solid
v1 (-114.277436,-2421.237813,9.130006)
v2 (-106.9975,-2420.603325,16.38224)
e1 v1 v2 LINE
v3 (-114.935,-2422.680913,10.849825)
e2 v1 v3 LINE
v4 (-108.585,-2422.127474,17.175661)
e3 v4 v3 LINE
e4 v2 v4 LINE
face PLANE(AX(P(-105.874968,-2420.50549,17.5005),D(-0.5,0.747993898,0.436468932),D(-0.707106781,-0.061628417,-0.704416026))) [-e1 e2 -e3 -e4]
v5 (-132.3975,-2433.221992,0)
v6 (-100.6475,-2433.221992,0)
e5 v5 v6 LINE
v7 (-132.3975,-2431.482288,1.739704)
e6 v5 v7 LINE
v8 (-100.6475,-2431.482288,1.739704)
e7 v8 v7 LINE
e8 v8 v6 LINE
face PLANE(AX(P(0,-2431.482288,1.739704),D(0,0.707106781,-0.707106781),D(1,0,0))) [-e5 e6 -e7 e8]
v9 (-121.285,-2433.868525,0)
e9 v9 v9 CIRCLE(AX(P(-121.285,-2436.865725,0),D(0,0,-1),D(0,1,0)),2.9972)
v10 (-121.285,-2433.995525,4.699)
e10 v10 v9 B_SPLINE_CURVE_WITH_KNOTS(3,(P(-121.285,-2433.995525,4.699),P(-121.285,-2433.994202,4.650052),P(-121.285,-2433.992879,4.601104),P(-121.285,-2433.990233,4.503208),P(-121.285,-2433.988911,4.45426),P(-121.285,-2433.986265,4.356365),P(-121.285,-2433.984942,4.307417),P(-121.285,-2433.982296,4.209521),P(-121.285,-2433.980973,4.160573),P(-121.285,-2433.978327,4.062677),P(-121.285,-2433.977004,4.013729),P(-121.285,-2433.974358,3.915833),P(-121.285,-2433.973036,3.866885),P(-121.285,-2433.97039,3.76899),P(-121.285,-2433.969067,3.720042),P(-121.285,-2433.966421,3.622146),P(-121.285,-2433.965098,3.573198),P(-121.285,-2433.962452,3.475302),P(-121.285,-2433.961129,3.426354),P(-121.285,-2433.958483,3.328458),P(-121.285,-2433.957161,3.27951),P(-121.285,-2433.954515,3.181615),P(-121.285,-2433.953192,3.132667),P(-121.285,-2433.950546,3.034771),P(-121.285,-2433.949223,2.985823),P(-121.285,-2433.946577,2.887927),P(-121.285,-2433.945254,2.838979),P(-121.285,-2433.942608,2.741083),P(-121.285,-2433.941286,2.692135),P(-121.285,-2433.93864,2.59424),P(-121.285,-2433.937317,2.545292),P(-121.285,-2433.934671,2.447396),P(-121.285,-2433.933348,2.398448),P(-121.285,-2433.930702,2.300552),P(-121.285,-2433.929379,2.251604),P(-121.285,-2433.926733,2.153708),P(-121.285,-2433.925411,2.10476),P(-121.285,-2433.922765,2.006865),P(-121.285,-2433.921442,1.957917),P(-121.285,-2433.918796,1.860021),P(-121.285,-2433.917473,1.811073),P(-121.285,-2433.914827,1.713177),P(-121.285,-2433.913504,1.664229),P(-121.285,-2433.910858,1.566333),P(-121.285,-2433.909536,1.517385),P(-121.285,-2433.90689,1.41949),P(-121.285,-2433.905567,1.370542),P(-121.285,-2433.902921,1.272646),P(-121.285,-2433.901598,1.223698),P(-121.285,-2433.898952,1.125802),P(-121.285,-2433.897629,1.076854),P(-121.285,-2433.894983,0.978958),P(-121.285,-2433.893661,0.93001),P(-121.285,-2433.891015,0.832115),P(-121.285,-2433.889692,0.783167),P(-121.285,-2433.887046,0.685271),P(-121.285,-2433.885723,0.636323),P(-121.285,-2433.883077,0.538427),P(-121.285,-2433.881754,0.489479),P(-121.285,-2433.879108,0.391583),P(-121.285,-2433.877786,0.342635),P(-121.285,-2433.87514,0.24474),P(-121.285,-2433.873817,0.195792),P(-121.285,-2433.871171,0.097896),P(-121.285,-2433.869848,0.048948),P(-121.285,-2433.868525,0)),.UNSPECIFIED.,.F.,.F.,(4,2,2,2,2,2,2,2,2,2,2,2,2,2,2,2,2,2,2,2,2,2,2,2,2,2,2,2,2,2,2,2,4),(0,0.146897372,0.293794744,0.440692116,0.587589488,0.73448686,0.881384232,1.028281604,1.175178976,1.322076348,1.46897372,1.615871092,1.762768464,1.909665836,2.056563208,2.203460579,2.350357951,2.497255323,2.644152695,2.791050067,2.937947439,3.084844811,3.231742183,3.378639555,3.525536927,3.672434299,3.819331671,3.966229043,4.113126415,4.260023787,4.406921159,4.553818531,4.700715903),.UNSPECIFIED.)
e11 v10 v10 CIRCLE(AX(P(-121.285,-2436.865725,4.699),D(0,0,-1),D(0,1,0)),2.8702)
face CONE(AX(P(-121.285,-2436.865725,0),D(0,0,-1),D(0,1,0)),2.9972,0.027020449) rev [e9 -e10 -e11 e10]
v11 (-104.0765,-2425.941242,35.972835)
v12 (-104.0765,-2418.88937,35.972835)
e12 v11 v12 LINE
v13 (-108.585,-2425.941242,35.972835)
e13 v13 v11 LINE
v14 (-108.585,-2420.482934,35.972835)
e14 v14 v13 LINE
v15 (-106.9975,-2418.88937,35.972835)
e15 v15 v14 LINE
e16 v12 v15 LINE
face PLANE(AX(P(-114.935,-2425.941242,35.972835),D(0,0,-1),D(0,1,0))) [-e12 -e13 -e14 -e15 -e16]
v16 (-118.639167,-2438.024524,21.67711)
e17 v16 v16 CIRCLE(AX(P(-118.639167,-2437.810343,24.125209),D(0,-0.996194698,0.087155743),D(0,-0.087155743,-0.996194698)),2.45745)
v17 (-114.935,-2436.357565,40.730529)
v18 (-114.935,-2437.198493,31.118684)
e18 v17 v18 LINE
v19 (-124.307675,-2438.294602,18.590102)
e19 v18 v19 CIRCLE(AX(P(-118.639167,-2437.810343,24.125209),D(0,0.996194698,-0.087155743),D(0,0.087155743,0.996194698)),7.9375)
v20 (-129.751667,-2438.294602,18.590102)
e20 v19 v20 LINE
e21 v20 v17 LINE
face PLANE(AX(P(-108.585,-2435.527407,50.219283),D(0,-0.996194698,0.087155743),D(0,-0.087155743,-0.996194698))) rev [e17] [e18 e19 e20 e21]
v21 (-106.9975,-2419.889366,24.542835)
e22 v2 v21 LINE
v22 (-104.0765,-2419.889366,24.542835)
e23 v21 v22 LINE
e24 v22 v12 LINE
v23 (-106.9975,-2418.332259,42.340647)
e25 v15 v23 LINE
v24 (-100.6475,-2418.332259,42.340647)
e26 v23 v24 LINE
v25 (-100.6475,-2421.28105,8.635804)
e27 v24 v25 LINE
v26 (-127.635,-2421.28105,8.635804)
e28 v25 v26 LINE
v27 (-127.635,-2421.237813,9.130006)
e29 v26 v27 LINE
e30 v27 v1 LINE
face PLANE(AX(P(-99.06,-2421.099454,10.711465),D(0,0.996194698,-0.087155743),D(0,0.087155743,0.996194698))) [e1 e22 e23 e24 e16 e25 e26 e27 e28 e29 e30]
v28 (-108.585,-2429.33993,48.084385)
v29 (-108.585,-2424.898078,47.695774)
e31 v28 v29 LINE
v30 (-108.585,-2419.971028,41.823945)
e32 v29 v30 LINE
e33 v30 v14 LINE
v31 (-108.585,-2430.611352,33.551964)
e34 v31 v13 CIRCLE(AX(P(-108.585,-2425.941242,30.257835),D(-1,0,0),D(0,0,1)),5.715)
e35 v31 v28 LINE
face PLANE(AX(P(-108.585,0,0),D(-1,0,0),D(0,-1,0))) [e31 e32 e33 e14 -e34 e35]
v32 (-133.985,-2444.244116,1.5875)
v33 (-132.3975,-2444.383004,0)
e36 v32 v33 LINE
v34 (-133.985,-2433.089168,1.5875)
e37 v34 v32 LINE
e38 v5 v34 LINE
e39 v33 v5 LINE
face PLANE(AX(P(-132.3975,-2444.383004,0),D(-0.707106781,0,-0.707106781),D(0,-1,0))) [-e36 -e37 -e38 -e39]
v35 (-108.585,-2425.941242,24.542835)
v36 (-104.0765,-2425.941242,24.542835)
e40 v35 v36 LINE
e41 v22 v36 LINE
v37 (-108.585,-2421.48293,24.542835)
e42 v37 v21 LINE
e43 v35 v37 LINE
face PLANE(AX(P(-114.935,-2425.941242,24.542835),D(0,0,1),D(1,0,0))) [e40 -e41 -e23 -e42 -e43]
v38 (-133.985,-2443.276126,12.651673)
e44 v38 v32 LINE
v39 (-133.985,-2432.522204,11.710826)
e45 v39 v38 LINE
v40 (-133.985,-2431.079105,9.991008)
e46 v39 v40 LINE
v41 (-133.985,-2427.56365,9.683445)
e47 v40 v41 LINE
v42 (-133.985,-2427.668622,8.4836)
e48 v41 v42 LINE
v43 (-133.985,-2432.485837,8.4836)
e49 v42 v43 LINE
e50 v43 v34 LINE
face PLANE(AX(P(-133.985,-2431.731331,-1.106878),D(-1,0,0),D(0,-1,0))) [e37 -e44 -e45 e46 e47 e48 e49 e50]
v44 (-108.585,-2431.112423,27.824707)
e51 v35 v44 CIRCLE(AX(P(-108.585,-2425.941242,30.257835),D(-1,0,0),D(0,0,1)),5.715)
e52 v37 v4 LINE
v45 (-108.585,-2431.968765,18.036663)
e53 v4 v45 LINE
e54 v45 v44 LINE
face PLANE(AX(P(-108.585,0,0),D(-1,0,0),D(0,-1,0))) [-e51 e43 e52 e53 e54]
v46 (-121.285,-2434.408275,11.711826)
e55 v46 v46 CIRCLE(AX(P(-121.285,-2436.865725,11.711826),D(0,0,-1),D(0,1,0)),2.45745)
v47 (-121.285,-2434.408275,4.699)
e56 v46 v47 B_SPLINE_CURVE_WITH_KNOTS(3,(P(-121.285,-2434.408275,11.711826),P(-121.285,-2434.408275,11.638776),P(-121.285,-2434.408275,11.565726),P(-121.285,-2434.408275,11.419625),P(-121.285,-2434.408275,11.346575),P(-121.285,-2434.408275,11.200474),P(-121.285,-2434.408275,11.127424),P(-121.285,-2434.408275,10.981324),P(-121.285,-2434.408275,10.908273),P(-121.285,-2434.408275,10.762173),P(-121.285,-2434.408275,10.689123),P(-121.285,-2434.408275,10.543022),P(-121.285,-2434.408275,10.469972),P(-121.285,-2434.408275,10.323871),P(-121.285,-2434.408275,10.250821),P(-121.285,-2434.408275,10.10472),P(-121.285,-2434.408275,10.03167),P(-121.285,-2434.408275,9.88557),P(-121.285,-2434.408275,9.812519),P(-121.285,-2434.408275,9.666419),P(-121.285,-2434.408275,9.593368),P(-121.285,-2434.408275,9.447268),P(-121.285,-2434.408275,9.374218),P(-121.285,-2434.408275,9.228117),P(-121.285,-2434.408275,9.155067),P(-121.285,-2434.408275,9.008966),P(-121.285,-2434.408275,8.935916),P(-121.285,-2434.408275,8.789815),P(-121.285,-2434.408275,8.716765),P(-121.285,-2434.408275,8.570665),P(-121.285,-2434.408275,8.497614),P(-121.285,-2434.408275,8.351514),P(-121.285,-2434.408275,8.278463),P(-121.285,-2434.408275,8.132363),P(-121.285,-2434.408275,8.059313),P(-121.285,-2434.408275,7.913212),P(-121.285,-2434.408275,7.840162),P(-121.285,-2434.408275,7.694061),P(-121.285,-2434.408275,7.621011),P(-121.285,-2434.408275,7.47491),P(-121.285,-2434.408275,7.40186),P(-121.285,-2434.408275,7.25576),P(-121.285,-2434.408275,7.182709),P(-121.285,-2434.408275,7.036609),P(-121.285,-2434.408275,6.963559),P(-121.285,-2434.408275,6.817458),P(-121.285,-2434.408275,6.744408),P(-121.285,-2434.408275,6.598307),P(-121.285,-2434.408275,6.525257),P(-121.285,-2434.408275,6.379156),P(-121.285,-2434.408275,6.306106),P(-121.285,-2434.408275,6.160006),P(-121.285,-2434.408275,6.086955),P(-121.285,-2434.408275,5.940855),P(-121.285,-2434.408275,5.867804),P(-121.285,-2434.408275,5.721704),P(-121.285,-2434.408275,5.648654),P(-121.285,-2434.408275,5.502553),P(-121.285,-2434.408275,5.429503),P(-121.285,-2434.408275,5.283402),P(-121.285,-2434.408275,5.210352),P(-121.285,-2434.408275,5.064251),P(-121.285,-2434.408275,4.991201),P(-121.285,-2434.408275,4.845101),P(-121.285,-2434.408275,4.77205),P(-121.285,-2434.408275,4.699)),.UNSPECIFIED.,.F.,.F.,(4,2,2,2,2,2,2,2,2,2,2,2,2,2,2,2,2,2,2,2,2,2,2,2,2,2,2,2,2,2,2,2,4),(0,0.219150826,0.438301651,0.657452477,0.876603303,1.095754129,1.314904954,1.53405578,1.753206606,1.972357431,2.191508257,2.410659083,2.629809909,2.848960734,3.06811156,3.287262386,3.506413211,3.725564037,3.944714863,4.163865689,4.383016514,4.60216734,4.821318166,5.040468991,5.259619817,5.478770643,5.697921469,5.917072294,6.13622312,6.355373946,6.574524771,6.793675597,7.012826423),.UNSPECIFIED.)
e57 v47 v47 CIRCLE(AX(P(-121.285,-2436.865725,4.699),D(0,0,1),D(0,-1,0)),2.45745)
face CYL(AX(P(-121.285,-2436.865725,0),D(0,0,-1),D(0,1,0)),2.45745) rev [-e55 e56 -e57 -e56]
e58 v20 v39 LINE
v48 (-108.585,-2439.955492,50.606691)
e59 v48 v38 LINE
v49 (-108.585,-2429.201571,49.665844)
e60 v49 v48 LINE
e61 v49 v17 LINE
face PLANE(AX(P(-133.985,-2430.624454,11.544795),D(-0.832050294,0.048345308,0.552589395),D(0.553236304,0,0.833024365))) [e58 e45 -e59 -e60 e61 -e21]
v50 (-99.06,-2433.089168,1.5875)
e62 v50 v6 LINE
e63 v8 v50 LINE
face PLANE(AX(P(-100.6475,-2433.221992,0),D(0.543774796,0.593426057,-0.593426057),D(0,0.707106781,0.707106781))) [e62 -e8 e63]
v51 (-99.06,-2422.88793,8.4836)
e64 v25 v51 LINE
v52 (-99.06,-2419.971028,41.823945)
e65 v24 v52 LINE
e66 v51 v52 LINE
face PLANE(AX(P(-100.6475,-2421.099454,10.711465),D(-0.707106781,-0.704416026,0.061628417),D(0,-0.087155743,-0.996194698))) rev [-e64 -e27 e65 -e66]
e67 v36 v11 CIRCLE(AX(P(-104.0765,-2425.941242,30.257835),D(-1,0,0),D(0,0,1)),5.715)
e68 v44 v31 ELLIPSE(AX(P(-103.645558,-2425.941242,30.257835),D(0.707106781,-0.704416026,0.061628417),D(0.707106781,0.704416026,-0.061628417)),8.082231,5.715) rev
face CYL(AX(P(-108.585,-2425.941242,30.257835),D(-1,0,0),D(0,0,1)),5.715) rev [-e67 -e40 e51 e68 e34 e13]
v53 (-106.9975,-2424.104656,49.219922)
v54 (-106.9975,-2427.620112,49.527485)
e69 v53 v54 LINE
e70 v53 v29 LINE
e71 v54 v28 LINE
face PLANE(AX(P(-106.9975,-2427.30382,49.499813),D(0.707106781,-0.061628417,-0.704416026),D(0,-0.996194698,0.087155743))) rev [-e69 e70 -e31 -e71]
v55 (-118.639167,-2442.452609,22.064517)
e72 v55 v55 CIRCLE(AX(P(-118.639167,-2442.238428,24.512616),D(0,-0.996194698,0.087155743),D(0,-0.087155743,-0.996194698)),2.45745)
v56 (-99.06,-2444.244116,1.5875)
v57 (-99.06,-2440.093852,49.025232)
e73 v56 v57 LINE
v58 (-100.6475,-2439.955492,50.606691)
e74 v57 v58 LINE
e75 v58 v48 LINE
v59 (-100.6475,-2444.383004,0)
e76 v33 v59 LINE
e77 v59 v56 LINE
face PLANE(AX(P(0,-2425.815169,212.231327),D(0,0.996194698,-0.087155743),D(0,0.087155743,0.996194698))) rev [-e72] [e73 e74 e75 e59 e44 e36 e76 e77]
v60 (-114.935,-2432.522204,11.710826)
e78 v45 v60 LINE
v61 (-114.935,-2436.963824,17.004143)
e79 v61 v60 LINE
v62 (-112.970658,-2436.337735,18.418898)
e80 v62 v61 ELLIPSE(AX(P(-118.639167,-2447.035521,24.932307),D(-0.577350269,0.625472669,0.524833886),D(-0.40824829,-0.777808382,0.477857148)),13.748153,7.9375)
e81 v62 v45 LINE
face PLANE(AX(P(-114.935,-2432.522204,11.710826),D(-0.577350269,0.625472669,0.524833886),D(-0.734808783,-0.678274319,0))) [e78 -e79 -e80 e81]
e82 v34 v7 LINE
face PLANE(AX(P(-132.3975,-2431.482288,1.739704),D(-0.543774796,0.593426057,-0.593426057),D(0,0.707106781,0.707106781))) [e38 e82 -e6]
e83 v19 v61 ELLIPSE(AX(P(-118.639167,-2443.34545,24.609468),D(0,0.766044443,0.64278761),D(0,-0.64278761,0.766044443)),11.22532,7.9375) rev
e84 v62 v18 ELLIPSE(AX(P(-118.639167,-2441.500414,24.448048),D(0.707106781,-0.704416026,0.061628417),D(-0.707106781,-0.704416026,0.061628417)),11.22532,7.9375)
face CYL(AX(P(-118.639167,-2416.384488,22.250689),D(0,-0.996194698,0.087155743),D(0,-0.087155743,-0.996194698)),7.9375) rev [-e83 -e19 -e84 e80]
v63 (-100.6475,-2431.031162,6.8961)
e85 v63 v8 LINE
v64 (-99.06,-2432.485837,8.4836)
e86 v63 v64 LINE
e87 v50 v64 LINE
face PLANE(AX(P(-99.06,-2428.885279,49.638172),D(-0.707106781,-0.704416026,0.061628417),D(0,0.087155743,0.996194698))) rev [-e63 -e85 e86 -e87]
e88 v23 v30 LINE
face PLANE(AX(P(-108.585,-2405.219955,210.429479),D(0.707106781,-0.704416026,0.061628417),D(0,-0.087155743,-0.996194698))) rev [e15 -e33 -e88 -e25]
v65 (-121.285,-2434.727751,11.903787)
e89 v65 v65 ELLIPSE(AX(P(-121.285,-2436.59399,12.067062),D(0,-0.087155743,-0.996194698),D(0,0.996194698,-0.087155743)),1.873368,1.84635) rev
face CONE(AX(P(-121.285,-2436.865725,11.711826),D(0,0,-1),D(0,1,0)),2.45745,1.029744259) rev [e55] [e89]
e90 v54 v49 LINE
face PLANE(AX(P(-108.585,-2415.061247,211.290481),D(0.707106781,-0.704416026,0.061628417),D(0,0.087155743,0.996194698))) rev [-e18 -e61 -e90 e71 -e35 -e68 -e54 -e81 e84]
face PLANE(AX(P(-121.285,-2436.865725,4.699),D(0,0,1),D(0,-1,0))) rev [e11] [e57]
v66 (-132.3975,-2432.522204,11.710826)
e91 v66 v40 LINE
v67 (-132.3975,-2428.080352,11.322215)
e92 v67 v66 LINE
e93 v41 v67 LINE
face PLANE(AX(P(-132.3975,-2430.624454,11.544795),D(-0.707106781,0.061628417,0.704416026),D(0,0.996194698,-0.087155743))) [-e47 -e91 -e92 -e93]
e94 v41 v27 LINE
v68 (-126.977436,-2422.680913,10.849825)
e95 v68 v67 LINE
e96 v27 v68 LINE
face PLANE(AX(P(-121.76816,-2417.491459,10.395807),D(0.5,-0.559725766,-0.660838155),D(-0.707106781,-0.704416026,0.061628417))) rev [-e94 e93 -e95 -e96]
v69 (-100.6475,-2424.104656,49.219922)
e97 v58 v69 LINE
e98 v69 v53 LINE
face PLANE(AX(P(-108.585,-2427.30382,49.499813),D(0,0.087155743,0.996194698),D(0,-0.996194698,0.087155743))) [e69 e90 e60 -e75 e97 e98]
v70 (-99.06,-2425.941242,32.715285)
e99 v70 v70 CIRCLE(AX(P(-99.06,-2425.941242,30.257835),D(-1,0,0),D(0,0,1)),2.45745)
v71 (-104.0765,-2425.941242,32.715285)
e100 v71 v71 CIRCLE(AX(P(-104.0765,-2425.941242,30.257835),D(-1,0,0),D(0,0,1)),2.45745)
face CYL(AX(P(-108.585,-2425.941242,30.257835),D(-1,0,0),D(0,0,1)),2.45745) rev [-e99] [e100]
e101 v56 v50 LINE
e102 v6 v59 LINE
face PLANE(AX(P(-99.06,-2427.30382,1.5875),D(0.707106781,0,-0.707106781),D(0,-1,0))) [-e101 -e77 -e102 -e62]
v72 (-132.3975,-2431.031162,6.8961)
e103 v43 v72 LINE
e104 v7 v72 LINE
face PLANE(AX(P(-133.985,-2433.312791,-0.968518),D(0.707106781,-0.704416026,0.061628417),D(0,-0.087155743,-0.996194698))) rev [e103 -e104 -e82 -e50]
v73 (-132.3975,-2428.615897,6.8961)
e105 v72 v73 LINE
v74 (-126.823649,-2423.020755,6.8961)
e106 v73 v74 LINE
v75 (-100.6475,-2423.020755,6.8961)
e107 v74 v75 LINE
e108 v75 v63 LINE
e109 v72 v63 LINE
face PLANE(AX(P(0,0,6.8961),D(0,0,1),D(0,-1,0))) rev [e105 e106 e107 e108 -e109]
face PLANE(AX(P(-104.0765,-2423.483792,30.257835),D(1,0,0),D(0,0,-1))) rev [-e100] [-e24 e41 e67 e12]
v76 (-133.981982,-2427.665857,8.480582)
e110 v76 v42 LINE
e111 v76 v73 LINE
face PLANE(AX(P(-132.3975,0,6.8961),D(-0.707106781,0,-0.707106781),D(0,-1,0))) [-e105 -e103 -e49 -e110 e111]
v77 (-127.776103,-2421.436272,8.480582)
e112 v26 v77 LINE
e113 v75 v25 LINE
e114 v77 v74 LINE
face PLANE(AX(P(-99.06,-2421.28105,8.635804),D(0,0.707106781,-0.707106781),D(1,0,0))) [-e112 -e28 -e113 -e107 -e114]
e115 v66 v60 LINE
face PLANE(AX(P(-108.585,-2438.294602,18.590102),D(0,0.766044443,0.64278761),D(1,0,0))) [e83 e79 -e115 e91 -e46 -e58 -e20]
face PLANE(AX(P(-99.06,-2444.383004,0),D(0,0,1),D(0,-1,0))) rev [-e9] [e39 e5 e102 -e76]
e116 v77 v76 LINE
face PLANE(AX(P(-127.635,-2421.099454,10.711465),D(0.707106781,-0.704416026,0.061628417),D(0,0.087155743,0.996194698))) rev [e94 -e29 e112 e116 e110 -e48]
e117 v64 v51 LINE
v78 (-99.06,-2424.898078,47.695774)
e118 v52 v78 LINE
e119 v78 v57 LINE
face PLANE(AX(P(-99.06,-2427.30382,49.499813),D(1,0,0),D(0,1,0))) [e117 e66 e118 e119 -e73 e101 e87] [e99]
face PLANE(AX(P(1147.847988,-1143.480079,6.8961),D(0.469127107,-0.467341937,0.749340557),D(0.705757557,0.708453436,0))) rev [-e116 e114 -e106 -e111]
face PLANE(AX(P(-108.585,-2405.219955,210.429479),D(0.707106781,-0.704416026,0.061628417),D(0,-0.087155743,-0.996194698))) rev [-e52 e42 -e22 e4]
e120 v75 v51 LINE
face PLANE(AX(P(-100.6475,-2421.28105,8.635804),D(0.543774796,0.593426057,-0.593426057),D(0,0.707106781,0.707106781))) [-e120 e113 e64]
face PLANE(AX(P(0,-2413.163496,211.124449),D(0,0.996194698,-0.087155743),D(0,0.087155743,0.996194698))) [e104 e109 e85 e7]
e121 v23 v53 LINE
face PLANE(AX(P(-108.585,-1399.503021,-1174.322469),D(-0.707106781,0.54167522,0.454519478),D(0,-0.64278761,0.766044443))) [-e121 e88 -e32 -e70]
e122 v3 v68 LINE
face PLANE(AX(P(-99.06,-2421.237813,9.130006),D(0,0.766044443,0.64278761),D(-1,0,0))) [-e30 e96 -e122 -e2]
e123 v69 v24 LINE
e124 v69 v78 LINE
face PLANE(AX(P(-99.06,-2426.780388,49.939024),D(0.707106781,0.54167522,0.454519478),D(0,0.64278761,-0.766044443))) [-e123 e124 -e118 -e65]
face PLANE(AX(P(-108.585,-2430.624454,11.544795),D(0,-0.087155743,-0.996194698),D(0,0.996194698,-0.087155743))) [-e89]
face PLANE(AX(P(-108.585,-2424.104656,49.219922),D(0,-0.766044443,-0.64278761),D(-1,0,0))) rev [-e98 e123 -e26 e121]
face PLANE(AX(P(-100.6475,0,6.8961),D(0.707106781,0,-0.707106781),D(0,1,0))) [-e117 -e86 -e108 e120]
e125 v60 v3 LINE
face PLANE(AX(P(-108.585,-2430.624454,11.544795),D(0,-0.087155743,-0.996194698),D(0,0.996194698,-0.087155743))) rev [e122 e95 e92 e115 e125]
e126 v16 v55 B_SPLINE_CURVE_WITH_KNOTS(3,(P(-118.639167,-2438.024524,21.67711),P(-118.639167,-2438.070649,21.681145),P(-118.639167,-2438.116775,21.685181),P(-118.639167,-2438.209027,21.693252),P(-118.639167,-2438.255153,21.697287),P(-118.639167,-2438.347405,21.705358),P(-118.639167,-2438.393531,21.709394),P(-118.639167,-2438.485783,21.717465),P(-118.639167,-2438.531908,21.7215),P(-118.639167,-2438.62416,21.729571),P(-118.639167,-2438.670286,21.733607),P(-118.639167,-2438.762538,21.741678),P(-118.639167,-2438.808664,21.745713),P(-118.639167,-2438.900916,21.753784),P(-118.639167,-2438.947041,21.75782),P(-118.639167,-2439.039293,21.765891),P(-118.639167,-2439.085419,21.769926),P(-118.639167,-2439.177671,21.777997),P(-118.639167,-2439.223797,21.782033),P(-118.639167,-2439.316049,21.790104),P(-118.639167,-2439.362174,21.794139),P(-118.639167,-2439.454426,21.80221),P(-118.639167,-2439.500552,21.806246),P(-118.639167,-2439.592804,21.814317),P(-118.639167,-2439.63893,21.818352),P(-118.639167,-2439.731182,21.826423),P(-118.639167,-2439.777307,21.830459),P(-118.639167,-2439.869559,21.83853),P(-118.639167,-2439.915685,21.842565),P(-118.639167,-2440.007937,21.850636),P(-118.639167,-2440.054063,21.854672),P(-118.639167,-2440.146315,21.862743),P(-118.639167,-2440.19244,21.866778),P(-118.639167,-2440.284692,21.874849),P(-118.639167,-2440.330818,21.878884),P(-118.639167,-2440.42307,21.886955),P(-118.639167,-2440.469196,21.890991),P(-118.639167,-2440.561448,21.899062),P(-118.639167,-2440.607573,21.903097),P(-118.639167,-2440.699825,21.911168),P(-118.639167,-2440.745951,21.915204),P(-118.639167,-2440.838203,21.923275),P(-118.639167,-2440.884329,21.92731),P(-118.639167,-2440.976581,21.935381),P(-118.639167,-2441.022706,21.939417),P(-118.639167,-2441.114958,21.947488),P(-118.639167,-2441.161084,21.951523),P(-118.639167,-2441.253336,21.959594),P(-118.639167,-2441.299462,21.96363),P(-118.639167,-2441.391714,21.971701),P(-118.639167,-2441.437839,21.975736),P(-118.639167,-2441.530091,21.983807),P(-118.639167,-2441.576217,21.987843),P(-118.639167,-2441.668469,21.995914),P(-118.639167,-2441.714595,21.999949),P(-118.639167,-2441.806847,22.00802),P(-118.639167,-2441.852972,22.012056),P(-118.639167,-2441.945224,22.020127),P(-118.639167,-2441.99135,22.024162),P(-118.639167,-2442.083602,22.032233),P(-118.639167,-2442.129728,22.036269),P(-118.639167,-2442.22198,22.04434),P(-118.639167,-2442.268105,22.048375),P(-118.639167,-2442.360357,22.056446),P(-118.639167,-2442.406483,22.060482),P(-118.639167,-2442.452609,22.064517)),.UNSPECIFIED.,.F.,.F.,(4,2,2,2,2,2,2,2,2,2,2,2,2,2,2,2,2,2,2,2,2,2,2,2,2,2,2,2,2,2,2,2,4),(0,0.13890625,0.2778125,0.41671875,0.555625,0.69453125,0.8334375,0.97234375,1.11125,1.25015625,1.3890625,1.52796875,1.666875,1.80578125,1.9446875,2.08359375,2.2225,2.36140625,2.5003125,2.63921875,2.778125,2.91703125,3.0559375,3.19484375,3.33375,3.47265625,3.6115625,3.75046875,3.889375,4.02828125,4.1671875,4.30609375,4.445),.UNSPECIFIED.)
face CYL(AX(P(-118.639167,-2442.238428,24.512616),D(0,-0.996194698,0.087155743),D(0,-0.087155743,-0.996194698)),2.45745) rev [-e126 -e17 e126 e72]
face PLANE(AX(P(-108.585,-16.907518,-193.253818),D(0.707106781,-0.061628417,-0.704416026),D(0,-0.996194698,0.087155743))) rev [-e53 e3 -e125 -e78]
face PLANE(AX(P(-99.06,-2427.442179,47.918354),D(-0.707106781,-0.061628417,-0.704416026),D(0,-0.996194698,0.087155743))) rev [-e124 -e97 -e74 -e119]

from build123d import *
from OCP.BRepFilletAPI import BRepFilletAPI_MakeChamfer

# Parameters (mm, degrees)
BOSS_EXTRUDE3_DEPTH             = 12.7
CUT_EXTRUDE1_DEPTH              = 2446.156245266122
CUT_EXTRUDE2_DEPTH              = 25.4
BOSS_EXTRUDE4_DEPTH             = 9.525
BOSS_EXTRUDE5_START             = -133.985000001
BOSS_EXTRUDE5_DEPTH             = 34.925
CUT_EXTRUDE3_REACH              = 2445.46
SKETCH12_W                      = 34.925000000000026
SKETCH12_H                      = 0.3325309889783057
CHAMFER4_SIZE                   = 6.35
CHAMFER5_SIZE                   = 1.5875
CHAMFER5_SIZE2                  = 1.7463498023569755
CHAMFER5_SIZE2_2                = 1.7463498023569135
CHAMFER5_SIZE2_3                = 1.695194438361193
CUT_EXTRUDE5_START              = 10.8585
CUT_EXTRUDE5_DEPTH              = 10.8585
F_8_START                       = -200.342016287
F_8_CLEARANCE_HOLE1_2_OUTLINE_W = 7
F_8_CLEARANCE_HOLE1_2_OUTLINE_H = 7
F_8_CLEARANCE_HOLE1_2_DEPTH     = 0.279842574
F_8_CLEARANCE_HOLE2_D           = 4.9149
CUT_EXTRUDE6_REACH              = 253.711
SKETCH24_R                      = 7.937499999999993


with BuildPart() as part:
    # Sketch6 → Boss-Extrude3 (new body)
    with BuildSketch(Plane(origin=(2.311843e-11, -2425.8151689885194, 212.23132709558422), x_dir=(1, 9.46e-15, -8.3e-16), z_dir=(9.493905125025943e-15, -0.9961946980917503, 0.08715574274760324))):
        Polygon((-99.0600000006817, -213.04201628669756), (-133.9850000006817, -213.04201628669756), (-133.9850000006817, -200.34201628669757), (-108.5850000006817, -162.24201628669755), (-99.0600000006817, -162.24201628669755), align=None)
    extrude(amount=-BOSS_EXTRUDE3_DEPTH)

    # Sketch7 → Cut-Extrude1 (cut, through all)
    with BuildSketch(Plane.ZY.offset(133.9850000006817)):
        Polygon((-2.4964e-13, -2444.383004154433), (0, -2431.6344922176327), (-1.1068779328950917, -2431.7313314886683), align=None)
    extrude(amount=-CUT_EXTRUDE1_DEPTH, mode=Mode.SUBTRACT)

    # Sketch8 → Cut-Extrude2 (cut)
    with BuildSketch(Plane.ZY.offset(133.9850000006817)):
        Polygon((50.219283386547545, -2435.5274069898373), (12.26426538925185, -2438.848040788521), (11.544794732870468, -2430.6244535557735), (49.49981273016616, -2427.30381975709), align=None)
    extrude(amount=-CUT_EXTRUDE2_DEPTH, mode=Mode.SUBTRACT)

    # Sketch10 → Boss-Extrude4 (add, through all)
    with BuildSketch(Plane.ZY.offset(108.58500000067501)):
        Polygon((49.499812730166134, -2427.3038197570895), (11.544794732870441, -2430.624453555773), (10.711465212786628, -2421.099453555773), (48.66648321008233, -2417.7788197570894), align=None)
    extrude(amount=-BOSS_EXTRUDE4_DEPTH)

    # Boss-Extrude5: read off the stored shape, not the designer's step
    # Boss-Extrude5 outline → Boss-Extrude5 (add)
    with BuildSketch(Plane.YZ.offset(BOSS_EXTRUDE5_START)):
        Polygon((-2420.768187948, 10.682483227), (-2430.624453556, 11.544794733), (-2431.031161645, 6.8961), (-2421.099453556, 6.8961), align=None)
    extrude(amount=BOSS_EXTRUDE5_DEPTH)

    # Sketch12 → Cut-Extrude3 (cut, up to next)
    with BuildSketch(Plane(origin=(0, -17.46095723301537, -199.5796544297948), x_dir=(1, 0, 0), z_dir=(0, 0.0871557427475931, 0.9961946980917512)), mode=Mode.PRIVATE) as cut_extrude3_sk1:
        with Locations((-116.52250000065857, -2412.653739397144)):
            Rectangle(SKETCH12_W, SKETCH12_H)
    cut_extrude3_tool1 = extrude(cut_extrude3_sk1.sketch, amount=-CUT_EXTRUDE3_REACH, mode=Mode.PRIVATE) & part.part
    add(cut_extrude3_tool1.solids().sort_by_distance((-116.5225, -2420.933821, 10.696974))[0], mode=Mode.SUBTRACT)

    # Chamfer4
    chamfer4_edges = [part.edges().sort_by_distance(p)[0] for p in [
        (-108.58500000065862, -2437.1877238891802, 31.241774387899785),
        (-108.58500000065875, -2425.8619535557737, 11.1281299728286),
        (-121.28500000065863, -2438.848040788522, 12.26426538925195),
        (-103.82250000065878, -2417.7788197570903, 48.6664832100824),
        (-133.98500000065857, -2421.266354157439, 8.803782606393371),
    ]]
    chamfer(chamfer4_edges, length=CHAMFER4_SIZE)

    # Chamfer5: one chamfer whose edges measure the first distance from different faces: ONE call of the kernel's chamfer builder (chamfer() names one face for all edges)
    chamfer5_edges_1 = [part.edges().sort_by_distance(p)[0] for p in [
        (-111.76000000038354, -2420.822734072567, 13.874383379035507),
        (-99.0600000006587, -2431.3328269313633, 3.4480500000041445),
        (-99.06000000065865, -2438.0087481860337, -4.5e-14),
        (-133.98500000065866, -2438.008748186034, -1.396e-14),
        (-133.98500000065872, -2431.332826931364, 3.448050000004116),
        (-133.985000001, -2429.419336186252, 6.8961),
        (-99.060000001, -2426.232208202052, 6.8961),
        (-108.58500000065878, -2419.43913665644, 29.688974211344913),
        (-99.06000000075693, -2419.8827567413205, 24.618373438599672),
        (-121.28500000051437, -2421.099453555774, 10.711465212786711),
        (-133.985000001, -2429.024871722332, 11.404849456074741),
        (-130.81000000070145, -2424.262371722282, 10.988184695738429),
        (-99.06000000065865, -2432.030074256415, 49.91330641979526),
        (-108.5850000006587, -2426.6531133734643, 49.44288329831503),
        (-108.58500000065877, -2421.218457406756, 45.780284526864456),
        (-99.06000000065876, -2421.2184574067555, 45.78028452686439),
    ]]
    chamfer5_edges_2 = [part.edges().sort_by_distance(p)[0] for p in [
        (-116.52250000065871, -2431.634492217634, 9.642e-14),
    ]]
    chamfer5_side_2 = [part.faces().sort_by_distance(p)[0] for p in [
        (-116.52250000065865, -2438.008748186034, -2.841e-14),
    ]]
    chamfer5_edges_3 = [part.edges().sort_by_distance(p)[0] for p in [
        (-113.34750000082943, -2421.433254759104, 6.896099999999999),
    ]]
    chamfer5_side_3 = [part.faces().sort_by_distance(p)[0] for p in [
        (-115.53645576803177, -2426.404038617734, 6.8961),
    ]]
    chamfer5_edges_4 = [part.edges().sort_by_distance(p)[0] for p in [
        (-130.81000000070134, -2424.6203827433465, 6.8961),
    ]]
    chamfer5_side_4 = [part.faces().sort_by_distance(p)[0] for p in [
        (-130.8815677895093, -2424.512945541763, 8.945261119766531),
    ]]
    chamfer5 = BRepFilletAPI_MakeChamfer(part.part.solid().wrapped)
    for e in chamfer5_edges_1:
        chamfer5.Add(CHAMFER5_SIZE, e.wrapped)
    for e in chamfer5_edges_2:
        chamfer5.Add(CHAMFER5_SIZE, CHAMFER5_SIZE2, e.wrapped, chamfer5_side_2[0].wrapped)  # the first distance lies on this face
    for e in chamfer5_edges_3:
        chamfer5.Add(CHAMFER5_SIZE, CHAMFER5_SIZE2_2, e.wrapped, chamfer5_side_3[0].wrapped)  # the first distance lies on this face
    for e in chamfer5_edges_4:
        chamfer5.Add(CHAMFER5_SIZE, CHAMFER5_SIZE2_3, e.wrapped, chamfer5_side_4[0].wrapped)  # the first distance lies on this face
    add(Compound.cast(chamfer5.Shape()), mode=Mode.REPLACE)

    # Sketch14 → CBORE for #8 Pan Head Machine Screw1 (revolve, cut)
    with BuildSketch(Plane(origin=(-108.58500000065874, -2425.9412416479745, 30.25783468724938), x_dir=(5.9e-16, 0, 1), z_dir=(-6.7e-15, 1, 0))):
        Polygon((0, 0), (-2.33e-15, 9.525000000000226), (2.4574499999999975, 9.525000000000226), (2.4574499999999997, 4.508499999999999), (5.715, 4.508499999999999), (5.715, 0), align=None)
    revolve(axis=Axis((-114.93500000065873, -2425.9412416479745, 30.257834687249385), (1, 7.96e-15, -5.9e-16)), mode=Mode.SUBTRACT)

    # Sketch16 → Cut-Extrude5 (cut)
    with BuildSketch(Plane.ZY.offset(104.07650000065875).offset(CUT_EXTRUDE5_START)):
        with BuildLine():
            Line((35.972834687249275, -2425.9412416479745), (35.972834687249254, -2417.8454644621274))
            Line((35.972834687249254, -2417.8454644621274), (24.542834687249364, -2418.845459886228))
            Line((24.542834687249364, -2418.845459886228), (24.542834687249364, -2425.9412416479745))
            ThreePointArc((24.542834687249364, -2425.9412416479745), (30.257834687249318, -2431.6562416479746), (35.972834687249275, -2425.9412416479745))
        make_face()
    extrude(amount=-CUT_EXTRUDE5_DEPTH, mode=Mode.SUBTRACT)

    # Sketch18 → Hole1 (revolve, cut)
    with BuildSketch(Plane(origin=(-121.28500000067221, -2436.8657251652107, -4.765035e-11), x_dir=(0, 1, 1.96e-14), z_dir=(1, 0, -8.3e-16))):
        Polygon((0, 0), (0, 4.6989999999999945), (2.870200000000013, 4.6989999999999945), (2.9972000000000123, 0), align=None)
    revolve(axis=Axis((-121.28500000067213, -2436.865725165213, 109.99999999995235), (-8.3e-16, 1.895e-14, -1)), mode=Mode.SUBTRACT)

    # #8 Clearance Hole1: read off the stored shape, not the designer's step
    # #8 Clearance Hole1 outline → #8 Clearance Hole1 (revolve, cut)
    with BuildSketch(Plane(origin=(-121.285000001, -2436.865725165, 0), x_dir=(1, 0, 0), z_dir=(0, -1, 0))):
        Polygon((2.45745, 4.699), (2.45745, 11.711826423), (1.590785336, 12.232571089), (0, 12.232571089), (0, 4.699), align=None)
    revolve(axis=Axis((-121.285000001, -2436.865725165, 0), (0, 0, 1)), mode=Mode.SUBTRACT)

    # 8 Clearance Hole1 2 outline → 8 Clearance Hole1 2 (add)
    with BuildSketch(Plane(origin=(0, 0, 0), x_dir=(1, 0, 0), z_dir=(0, 0.08715574274759312, 0.9961946980917512)).offset(F_8_START)):
        with Locations((-121.50000000000001, -2428.5)):
            Rectangle(F_8_CLEARANCE_HOLE1_2_OUTLINE_W, F_8_CLEARANCE_HOLE1_2_OUTLINE_H)
    extrude(amount=F_8_CLEARANCE_HOLE1_2_DEPTH)

    # #8 Clearance Hole2 (through all)
    with Locations(Plane(origin=(3.101414e-11, -2425.8151689885194, 212.23132709558124), x_dir=(-1, -1.269e-14, 1.11e-15), z_dir=(1.2736388665441791e-14, -0.9961946980917505, 0.08715574274760202))):
        with Locations((118.639166667, 188.435766287)):
            Hole(F_8_CLEARANCE_HOLE2_D / 2)

    # Sketch24 → Cut-Extrude6 (cut, up to next)
    with BuildSketch(Plane(origin=(2.307623e-11, -2421.3870835555053, 211.84391981904722), x_dir=(1, 9.46e-15, -8.3e-16), z_dir=(-9.493905125025941e-15, 0.9961946980917512, -0.08715574274759331)), mode=Mode.PRIVATE) as cut_extrude6_sk1:
        with Locations((-118.6391666673483, 188.43576628667344)):
            Circle(SKETCH24_R)
    cut_extrude6_tool1 = extrude(cut_extrude6_sk1.sketch, amount=CUT_EXTRUDE6_REACH, mode=Mode.PRIVATE) & part.part
    add(cut_extrude6_tool1.solids().sort_by_distance((-118.639167, -2437.810343, 24.125209))[0], mode=Mode.SUBTRACT)


solid = part.part
